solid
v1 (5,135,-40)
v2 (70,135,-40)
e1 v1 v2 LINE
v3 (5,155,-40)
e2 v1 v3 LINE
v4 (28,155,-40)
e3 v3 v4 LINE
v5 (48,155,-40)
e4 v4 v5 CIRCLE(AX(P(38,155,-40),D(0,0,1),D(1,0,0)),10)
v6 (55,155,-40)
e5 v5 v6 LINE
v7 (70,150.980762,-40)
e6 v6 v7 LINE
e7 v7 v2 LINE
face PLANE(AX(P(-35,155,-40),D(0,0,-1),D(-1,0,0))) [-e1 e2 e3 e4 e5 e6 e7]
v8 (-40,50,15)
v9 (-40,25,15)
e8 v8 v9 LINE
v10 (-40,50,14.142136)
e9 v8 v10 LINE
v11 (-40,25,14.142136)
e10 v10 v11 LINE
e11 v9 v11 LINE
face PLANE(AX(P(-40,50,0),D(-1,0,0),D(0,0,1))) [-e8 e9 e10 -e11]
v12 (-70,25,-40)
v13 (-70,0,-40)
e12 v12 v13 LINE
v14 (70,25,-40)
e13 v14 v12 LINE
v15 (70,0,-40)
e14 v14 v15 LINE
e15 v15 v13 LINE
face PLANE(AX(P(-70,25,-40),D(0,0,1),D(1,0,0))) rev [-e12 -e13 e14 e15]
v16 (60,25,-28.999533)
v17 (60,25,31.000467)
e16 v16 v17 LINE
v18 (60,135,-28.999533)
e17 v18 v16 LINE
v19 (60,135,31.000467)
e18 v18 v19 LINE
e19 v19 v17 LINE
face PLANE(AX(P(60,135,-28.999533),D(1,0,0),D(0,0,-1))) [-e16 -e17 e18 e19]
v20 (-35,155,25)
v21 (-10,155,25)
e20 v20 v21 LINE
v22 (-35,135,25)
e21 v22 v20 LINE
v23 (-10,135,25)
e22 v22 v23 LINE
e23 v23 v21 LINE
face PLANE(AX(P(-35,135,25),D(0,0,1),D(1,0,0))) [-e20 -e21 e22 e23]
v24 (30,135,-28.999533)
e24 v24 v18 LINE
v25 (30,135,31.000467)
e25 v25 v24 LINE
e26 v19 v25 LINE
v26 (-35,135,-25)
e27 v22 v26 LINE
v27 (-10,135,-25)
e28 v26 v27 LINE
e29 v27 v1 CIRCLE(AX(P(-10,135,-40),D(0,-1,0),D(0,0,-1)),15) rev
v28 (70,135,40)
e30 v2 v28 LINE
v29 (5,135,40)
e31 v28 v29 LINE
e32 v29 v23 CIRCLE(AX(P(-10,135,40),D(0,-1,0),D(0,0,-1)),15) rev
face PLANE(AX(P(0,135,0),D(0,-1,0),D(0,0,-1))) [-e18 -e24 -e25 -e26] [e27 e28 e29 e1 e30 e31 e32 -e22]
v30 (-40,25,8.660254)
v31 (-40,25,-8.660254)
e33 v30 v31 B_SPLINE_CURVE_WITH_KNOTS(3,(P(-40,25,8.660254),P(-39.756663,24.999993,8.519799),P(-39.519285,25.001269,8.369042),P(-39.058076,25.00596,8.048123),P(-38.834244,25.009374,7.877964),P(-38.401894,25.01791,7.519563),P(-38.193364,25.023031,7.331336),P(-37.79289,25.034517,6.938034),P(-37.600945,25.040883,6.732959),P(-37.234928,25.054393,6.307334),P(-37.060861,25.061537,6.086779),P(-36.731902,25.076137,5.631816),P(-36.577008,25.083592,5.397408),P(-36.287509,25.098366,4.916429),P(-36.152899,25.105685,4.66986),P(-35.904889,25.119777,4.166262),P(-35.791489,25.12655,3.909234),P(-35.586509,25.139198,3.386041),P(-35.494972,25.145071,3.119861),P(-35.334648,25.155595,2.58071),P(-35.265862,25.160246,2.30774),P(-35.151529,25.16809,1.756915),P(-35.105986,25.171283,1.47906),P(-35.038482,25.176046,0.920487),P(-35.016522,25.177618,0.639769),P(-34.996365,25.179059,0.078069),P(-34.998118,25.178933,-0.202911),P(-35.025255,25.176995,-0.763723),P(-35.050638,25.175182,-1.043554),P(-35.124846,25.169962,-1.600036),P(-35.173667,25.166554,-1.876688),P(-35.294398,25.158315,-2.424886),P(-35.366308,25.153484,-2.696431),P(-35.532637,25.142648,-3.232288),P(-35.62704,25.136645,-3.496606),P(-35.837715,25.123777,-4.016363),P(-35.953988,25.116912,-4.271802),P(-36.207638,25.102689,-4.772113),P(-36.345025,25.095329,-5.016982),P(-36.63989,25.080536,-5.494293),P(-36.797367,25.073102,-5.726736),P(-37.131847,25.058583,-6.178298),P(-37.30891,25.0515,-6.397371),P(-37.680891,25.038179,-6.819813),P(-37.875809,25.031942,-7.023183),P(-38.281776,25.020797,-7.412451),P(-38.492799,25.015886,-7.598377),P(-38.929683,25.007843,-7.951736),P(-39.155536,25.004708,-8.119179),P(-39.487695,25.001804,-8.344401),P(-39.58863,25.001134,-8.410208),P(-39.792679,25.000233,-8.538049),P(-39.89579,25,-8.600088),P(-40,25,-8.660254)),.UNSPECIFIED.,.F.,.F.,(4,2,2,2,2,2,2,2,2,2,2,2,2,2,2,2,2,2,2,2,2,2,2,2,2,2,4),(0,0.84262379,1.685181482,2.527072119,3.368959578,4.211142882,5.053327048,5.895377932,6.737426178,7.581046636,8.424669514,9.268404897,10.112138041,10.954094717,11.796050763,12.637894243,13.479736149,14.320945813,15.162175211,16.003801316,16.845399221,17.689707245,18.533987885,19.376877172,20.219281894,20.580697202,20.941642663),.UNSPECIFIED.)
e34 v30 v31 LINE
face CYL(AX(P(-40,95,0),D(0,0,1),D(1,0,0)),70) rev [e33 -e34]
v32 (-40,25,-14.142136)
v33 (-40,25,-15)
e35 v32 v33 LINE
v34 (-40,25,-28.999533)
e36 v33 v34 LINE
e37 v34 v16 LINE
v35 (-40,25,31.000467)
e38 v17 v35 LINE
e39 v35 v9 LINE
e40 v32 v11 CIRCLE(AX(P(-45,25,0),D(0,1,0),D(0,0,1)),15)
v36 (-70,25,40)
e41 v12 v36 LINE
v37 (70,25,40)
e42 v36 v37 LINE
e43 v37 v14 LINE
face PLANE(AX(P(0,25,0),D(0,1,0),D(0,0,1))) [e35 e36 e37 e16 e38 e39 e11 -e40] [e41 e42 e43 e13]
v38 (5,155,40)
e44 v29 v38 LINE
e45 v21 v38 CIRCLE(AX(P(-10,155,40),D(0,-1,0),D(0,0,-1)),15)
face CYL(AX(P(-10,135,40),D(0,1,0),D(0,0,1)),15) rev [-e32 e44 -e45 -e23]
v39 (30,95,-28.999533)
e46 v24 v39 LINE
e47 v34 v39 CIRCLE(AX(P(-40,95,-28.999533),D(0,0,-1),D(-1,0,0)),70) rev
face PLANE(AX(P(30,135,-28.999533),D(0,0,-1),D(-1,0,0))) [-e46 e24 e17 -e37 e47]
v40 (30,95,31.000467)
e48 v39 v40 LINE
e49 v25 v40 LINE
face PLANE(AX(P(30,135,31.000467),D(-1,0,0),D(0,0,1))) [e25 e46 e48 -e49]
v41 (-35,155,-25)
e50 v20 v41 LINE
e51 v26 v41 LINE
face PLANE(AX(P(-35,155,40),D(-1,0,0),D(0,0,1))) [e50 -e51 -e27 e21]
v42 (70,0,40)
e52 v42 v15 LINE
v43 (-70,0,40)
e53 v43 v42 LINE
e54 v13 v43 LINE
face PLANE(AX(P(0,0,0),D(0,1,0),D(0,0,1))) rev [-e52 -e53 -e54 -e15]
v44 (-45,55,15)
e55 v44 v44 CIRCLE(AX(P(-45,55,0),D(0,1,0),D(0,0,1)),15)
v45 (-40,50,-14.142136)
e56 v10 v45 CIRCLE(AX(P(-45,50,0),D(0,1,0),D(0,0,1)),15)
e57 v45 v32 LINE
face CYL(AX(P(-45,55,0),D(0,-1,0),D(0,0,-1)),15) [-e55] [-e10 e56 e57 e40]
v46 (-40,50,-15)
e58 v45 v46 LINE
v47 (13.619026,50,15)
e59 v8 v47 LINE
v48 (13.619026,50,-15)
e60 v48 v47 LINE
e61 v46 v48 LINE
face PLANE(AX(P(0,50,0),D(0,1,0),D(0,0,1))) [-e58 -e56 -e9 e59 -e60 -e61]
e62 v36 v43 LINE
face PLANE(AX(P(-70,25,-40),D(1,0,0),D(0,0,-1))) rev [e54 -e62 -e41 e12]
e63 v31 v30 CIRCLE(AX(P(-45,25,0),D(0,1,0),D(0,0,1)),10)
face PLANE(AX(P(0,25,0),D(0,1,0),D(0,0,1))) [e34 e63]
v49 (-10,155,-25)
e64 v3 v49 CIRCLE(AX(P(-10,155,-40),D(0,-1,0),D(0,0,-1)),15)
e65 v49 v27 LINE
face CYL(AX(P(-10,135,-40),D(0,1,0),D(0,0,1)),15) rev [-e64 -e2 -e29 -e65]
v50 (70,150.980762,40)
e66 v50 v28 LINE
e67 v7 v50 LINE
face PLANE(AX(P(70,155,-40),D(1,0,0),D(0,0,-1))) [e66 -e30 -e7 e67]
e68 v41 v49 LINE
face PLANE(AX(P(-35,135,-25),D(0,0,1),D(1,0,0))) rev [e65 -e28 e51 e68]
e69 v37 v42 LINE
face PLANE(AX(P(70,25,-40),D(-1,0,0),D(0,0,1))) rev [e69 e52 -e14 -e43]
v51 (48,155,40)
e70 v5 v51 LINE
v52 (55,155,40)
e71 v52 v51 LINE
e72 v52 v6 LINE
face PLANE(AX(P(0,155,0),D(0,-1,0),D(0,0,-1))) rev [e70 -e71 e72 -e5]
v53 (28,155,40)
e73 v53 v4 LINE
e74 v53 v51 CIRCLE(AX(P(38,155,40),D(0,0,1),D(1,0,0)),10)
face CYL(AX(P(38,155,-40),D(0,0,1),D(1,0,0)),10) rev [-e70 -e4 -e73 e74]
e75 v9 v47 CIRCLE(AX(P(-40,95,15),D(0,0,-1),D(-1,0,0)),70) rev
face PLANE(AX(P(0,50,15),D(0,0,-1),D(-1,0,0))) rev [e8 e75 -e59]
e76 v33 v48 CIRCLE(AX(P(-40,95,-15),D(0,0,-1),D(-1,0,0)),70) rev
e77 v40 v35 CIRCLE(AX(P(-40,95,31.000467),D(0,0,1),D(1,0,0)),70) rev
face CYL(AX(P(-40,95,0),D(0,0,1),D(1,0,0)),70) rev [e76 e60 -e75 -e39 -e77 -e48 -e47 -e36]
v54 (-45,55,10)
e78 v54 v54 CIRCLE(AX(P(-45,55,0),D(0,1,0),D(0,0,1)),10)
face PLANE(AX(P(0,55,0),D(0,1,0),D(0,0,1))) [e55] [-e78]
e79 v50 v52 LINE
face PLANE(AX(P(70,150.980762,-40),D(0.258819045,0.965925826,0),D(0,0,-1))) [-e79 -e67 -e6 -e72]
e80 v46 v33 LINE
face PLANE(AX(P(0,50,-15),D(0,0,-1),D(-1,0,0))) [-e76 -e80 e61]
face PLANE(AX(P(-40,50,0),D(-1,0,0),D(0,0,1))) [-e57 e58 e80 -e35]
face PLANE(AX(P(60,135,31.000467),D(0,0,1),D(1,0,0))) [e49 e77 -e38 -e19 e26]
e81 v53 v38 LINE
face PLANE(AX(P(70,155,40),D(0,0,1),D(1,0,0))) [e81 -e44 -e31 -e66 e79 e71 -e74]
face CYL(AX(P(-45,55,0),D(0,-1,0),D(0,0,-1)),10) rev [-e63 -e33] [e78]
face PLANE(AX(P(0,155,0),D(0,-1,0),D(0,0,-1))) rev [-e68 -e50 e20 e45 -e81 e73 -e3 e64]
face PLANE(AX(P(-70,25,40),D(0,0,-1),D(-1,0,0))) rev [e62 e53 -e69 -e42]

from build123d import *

# Parameters (mm, degrees)
SKETCH1_W           = 140
SKETCH1_H           = 80
BOSS_EXTRUDE1_DEPTH = 25
SKETCH2_W           = 30
SKETCH2_H           = 60
BOSS_EXTRUDE2_DEPTH = 110
FILLET1_R           = 70
BOSS_EXTRUDE4_DEPTH = 30
SKETCH6_W           = 105
SKETCH6_H           = 80
BOSS_EXTRUDE5_DEPTH = 20
CUT_EXTRUDE1_DEPTH  = 188.949461292
CHAMFER1_SIZE       = 15
CHAMFER1_SIZE2      = 4.019237886
BOSS_EXTRUDE8_DEPTH = 25
SKETCH14_W          = 40
SKETCH14_H          = 15
CUT_EXTRUDE4_DEPTH  = 20
FILLET2_R           = 15


with BuildPart() as part:
    # Sketch1 → Boss-Extrude1 (new body)
    with BuildSketch(Plane(origin=(0, 0, 0), x_dir=(1, 0, 0), z_dir=(0, 1, 0))):
        Rectangle(SKETCH1_W, SKETCH1_H)
    extrude(amount=BOSS_EXTRUDE1_DEPTH)

    # Sketch2 → Boss-Extrude2 (add)
    with BuildSketch(Plane(origin=(0, 25, 0), x_dir=(1, 0, 0), z_dir=(0, 1, 0))):
        with Locations((45, -1.000466796)):
            Rectangle(SKETCH2_W, SKETCH2_H)
    extrude(amount=BOSS_EXTRUDE2_DEPTH)

    # Fillet1
    fillet1_edges = [part.edges().sort_by_distance(p)[0] for p in [
        (30, 25, 1.000466796),
    ]]
    fillet(fillet1_edges, radius=FILLET1_R)

    # Sketch4 → Boss-Extrude4 (add)
    with BuildSketch(Plane(origin=(0, 25, 0), x_dir=(1, 0, 0), z_dir=(0, 1, 0))):
        with BuildLine():
            ThreePointArc((-40, 14.142135624), (-53.660254038, 12.247448714), (-60, 0))
            Line((-60, 0), (-55, 0))
            ThreePointArc((-55, 0), (-50, 8.660254038), (-40, 8.660254038))
            Line((-40, 8.660254038), (-40, 14.142135624))
        make_face()
        with BuildLine():
            Line((-55, 0), (-60, 0))
            ThreePointArc((-60, 0), (-53.660254038, -12.247448714), (-40, -14.142135624))
            Line((-40, -14.142135624), (-40, -8.660254038))
            ThreePointArc((-40, -8.660254038), (-50, -8.660254038), (-55, 0))
        make_face()
        with BuildLine():
            ThreePointArc((-30, 0), (-32.752551286, 8.660254038), (-40, 14.142135624))
            Line((-40, 14.142135624), (-40, 8.660254038))
            ThreePointArc((-40, 8.660254038), (-36.339745962, 5), (-35, 0))
            ThreePointArc((-35, 0), (-36.339745962, -5), (-40, -8.660254038))
            Line((-40, -8.660254038), (-40, -14.142135624))
            ThreePointArc((-40, -14.142135624), (-32.752551286, -8.660254038), (-30, 0))
        make_face()
    extrude(amount=BOSS_EXTRUDE4_DEPTH)

    # Sketch6 → Boss-Extrude5 (add)
    with BuildSketch(Plane(origin=(0, 135, 0), x_dir=(1, 0, 0), z_dir=(0, 1, 0))):
        with Locations((17.5, 0)):
            Rectangle(SKETCH6_W, SKETCH6_H)
    extrude(amount=BOSS_EXTRUDE5_DEPTH)

    # Sketch7 → Cut-Extrude1 (cut, through all)
    with BuildSketch(Plane.XY.offset(40)):
        with BuildLine():
            ThreePointArc((48, 155), (38, 165), (28, 155))
            Line((28, 155), (38, 155))
            Line((38, 155), (48, 155))
        make_face()
        with BuildLine():
            Line((38, 155), (28, 155))
            ThreePointArc((28, 155), (38, 145), (48, 155))
            Line((48, 155), (38, 155))
        make_face()
    extrude(amount=-CUT_EXTRUDE1_DEPTH, mode=Mode.SUBTRACT)

    # Chamfer1
    chamfer1_edges = [part.edges().sort_by_distance(p)[0] for p in [
        (70, 155, 0),
    ]]
    chamfer1_side = [part.faces().sort_by_distance(p)[0] for p in [
        (59, 155, 0),
    ]]
    chamfer(chamfer1_edges, length=CHAMFER1_SIZE, length2=CHAMFER1_SIZE2, reference=chamfer1_side[0])

    # Sketch13 → Boss-Extrude8 (add)
    with BuildSketch(Plane(origin=(0, 25, 0), x_dir=(1, 0, 0), z_dir=(0, 1, 0))):
        with BuildLine():
            Line((-40, -14.142135624), (-40, -15))
            Line((-40, -15), (16, -15))
            Line((16, -15), (16, 15))
            Line((16, 15), (-40, 15))
            Line((-40, 15), (-40, 14.142135624))
            ThreePointArc((-40, 14.142135624), (-32.752551286, 8.660254038), (-30, 0))
            ThreePointArc((-30, 0), (-32.752551286, -8.660254038), (-40, -14.142135624))
        make_face()
    extrude(amount=BOSS_EXTRUDE8_DEPTH)

    # Sketch14 → Cut-Extrude4 (cut)
    with BuildSketch(Plane(origin=(0, 155, 0), x_dir=(1, 0, 0), z_dir=(0, 1, 0))):
        with Locations((-15, 32.5)):
            Rectangle(SKETCH14_W, SKETCH14_H)
        with Locations((-15, -32.5)):
            Rectangle(SKETCH14_W, SKETCH14_H)
    extrude(amount=-CUT_EXTRUDE4_DEPTH, mode=Mode.SUBTRACT)

    # Fillet2
    fillet2_edges = [part.edges().sort_by_distance(p)[0] for p in [
        (5, 145, -25),
        (5, 145, 25),
    ]]
    fillet(fillet2_edges, radius=FILLET2_R - 0.0001)  # a hair under: the kernel refuses the full size


solid = part.part
